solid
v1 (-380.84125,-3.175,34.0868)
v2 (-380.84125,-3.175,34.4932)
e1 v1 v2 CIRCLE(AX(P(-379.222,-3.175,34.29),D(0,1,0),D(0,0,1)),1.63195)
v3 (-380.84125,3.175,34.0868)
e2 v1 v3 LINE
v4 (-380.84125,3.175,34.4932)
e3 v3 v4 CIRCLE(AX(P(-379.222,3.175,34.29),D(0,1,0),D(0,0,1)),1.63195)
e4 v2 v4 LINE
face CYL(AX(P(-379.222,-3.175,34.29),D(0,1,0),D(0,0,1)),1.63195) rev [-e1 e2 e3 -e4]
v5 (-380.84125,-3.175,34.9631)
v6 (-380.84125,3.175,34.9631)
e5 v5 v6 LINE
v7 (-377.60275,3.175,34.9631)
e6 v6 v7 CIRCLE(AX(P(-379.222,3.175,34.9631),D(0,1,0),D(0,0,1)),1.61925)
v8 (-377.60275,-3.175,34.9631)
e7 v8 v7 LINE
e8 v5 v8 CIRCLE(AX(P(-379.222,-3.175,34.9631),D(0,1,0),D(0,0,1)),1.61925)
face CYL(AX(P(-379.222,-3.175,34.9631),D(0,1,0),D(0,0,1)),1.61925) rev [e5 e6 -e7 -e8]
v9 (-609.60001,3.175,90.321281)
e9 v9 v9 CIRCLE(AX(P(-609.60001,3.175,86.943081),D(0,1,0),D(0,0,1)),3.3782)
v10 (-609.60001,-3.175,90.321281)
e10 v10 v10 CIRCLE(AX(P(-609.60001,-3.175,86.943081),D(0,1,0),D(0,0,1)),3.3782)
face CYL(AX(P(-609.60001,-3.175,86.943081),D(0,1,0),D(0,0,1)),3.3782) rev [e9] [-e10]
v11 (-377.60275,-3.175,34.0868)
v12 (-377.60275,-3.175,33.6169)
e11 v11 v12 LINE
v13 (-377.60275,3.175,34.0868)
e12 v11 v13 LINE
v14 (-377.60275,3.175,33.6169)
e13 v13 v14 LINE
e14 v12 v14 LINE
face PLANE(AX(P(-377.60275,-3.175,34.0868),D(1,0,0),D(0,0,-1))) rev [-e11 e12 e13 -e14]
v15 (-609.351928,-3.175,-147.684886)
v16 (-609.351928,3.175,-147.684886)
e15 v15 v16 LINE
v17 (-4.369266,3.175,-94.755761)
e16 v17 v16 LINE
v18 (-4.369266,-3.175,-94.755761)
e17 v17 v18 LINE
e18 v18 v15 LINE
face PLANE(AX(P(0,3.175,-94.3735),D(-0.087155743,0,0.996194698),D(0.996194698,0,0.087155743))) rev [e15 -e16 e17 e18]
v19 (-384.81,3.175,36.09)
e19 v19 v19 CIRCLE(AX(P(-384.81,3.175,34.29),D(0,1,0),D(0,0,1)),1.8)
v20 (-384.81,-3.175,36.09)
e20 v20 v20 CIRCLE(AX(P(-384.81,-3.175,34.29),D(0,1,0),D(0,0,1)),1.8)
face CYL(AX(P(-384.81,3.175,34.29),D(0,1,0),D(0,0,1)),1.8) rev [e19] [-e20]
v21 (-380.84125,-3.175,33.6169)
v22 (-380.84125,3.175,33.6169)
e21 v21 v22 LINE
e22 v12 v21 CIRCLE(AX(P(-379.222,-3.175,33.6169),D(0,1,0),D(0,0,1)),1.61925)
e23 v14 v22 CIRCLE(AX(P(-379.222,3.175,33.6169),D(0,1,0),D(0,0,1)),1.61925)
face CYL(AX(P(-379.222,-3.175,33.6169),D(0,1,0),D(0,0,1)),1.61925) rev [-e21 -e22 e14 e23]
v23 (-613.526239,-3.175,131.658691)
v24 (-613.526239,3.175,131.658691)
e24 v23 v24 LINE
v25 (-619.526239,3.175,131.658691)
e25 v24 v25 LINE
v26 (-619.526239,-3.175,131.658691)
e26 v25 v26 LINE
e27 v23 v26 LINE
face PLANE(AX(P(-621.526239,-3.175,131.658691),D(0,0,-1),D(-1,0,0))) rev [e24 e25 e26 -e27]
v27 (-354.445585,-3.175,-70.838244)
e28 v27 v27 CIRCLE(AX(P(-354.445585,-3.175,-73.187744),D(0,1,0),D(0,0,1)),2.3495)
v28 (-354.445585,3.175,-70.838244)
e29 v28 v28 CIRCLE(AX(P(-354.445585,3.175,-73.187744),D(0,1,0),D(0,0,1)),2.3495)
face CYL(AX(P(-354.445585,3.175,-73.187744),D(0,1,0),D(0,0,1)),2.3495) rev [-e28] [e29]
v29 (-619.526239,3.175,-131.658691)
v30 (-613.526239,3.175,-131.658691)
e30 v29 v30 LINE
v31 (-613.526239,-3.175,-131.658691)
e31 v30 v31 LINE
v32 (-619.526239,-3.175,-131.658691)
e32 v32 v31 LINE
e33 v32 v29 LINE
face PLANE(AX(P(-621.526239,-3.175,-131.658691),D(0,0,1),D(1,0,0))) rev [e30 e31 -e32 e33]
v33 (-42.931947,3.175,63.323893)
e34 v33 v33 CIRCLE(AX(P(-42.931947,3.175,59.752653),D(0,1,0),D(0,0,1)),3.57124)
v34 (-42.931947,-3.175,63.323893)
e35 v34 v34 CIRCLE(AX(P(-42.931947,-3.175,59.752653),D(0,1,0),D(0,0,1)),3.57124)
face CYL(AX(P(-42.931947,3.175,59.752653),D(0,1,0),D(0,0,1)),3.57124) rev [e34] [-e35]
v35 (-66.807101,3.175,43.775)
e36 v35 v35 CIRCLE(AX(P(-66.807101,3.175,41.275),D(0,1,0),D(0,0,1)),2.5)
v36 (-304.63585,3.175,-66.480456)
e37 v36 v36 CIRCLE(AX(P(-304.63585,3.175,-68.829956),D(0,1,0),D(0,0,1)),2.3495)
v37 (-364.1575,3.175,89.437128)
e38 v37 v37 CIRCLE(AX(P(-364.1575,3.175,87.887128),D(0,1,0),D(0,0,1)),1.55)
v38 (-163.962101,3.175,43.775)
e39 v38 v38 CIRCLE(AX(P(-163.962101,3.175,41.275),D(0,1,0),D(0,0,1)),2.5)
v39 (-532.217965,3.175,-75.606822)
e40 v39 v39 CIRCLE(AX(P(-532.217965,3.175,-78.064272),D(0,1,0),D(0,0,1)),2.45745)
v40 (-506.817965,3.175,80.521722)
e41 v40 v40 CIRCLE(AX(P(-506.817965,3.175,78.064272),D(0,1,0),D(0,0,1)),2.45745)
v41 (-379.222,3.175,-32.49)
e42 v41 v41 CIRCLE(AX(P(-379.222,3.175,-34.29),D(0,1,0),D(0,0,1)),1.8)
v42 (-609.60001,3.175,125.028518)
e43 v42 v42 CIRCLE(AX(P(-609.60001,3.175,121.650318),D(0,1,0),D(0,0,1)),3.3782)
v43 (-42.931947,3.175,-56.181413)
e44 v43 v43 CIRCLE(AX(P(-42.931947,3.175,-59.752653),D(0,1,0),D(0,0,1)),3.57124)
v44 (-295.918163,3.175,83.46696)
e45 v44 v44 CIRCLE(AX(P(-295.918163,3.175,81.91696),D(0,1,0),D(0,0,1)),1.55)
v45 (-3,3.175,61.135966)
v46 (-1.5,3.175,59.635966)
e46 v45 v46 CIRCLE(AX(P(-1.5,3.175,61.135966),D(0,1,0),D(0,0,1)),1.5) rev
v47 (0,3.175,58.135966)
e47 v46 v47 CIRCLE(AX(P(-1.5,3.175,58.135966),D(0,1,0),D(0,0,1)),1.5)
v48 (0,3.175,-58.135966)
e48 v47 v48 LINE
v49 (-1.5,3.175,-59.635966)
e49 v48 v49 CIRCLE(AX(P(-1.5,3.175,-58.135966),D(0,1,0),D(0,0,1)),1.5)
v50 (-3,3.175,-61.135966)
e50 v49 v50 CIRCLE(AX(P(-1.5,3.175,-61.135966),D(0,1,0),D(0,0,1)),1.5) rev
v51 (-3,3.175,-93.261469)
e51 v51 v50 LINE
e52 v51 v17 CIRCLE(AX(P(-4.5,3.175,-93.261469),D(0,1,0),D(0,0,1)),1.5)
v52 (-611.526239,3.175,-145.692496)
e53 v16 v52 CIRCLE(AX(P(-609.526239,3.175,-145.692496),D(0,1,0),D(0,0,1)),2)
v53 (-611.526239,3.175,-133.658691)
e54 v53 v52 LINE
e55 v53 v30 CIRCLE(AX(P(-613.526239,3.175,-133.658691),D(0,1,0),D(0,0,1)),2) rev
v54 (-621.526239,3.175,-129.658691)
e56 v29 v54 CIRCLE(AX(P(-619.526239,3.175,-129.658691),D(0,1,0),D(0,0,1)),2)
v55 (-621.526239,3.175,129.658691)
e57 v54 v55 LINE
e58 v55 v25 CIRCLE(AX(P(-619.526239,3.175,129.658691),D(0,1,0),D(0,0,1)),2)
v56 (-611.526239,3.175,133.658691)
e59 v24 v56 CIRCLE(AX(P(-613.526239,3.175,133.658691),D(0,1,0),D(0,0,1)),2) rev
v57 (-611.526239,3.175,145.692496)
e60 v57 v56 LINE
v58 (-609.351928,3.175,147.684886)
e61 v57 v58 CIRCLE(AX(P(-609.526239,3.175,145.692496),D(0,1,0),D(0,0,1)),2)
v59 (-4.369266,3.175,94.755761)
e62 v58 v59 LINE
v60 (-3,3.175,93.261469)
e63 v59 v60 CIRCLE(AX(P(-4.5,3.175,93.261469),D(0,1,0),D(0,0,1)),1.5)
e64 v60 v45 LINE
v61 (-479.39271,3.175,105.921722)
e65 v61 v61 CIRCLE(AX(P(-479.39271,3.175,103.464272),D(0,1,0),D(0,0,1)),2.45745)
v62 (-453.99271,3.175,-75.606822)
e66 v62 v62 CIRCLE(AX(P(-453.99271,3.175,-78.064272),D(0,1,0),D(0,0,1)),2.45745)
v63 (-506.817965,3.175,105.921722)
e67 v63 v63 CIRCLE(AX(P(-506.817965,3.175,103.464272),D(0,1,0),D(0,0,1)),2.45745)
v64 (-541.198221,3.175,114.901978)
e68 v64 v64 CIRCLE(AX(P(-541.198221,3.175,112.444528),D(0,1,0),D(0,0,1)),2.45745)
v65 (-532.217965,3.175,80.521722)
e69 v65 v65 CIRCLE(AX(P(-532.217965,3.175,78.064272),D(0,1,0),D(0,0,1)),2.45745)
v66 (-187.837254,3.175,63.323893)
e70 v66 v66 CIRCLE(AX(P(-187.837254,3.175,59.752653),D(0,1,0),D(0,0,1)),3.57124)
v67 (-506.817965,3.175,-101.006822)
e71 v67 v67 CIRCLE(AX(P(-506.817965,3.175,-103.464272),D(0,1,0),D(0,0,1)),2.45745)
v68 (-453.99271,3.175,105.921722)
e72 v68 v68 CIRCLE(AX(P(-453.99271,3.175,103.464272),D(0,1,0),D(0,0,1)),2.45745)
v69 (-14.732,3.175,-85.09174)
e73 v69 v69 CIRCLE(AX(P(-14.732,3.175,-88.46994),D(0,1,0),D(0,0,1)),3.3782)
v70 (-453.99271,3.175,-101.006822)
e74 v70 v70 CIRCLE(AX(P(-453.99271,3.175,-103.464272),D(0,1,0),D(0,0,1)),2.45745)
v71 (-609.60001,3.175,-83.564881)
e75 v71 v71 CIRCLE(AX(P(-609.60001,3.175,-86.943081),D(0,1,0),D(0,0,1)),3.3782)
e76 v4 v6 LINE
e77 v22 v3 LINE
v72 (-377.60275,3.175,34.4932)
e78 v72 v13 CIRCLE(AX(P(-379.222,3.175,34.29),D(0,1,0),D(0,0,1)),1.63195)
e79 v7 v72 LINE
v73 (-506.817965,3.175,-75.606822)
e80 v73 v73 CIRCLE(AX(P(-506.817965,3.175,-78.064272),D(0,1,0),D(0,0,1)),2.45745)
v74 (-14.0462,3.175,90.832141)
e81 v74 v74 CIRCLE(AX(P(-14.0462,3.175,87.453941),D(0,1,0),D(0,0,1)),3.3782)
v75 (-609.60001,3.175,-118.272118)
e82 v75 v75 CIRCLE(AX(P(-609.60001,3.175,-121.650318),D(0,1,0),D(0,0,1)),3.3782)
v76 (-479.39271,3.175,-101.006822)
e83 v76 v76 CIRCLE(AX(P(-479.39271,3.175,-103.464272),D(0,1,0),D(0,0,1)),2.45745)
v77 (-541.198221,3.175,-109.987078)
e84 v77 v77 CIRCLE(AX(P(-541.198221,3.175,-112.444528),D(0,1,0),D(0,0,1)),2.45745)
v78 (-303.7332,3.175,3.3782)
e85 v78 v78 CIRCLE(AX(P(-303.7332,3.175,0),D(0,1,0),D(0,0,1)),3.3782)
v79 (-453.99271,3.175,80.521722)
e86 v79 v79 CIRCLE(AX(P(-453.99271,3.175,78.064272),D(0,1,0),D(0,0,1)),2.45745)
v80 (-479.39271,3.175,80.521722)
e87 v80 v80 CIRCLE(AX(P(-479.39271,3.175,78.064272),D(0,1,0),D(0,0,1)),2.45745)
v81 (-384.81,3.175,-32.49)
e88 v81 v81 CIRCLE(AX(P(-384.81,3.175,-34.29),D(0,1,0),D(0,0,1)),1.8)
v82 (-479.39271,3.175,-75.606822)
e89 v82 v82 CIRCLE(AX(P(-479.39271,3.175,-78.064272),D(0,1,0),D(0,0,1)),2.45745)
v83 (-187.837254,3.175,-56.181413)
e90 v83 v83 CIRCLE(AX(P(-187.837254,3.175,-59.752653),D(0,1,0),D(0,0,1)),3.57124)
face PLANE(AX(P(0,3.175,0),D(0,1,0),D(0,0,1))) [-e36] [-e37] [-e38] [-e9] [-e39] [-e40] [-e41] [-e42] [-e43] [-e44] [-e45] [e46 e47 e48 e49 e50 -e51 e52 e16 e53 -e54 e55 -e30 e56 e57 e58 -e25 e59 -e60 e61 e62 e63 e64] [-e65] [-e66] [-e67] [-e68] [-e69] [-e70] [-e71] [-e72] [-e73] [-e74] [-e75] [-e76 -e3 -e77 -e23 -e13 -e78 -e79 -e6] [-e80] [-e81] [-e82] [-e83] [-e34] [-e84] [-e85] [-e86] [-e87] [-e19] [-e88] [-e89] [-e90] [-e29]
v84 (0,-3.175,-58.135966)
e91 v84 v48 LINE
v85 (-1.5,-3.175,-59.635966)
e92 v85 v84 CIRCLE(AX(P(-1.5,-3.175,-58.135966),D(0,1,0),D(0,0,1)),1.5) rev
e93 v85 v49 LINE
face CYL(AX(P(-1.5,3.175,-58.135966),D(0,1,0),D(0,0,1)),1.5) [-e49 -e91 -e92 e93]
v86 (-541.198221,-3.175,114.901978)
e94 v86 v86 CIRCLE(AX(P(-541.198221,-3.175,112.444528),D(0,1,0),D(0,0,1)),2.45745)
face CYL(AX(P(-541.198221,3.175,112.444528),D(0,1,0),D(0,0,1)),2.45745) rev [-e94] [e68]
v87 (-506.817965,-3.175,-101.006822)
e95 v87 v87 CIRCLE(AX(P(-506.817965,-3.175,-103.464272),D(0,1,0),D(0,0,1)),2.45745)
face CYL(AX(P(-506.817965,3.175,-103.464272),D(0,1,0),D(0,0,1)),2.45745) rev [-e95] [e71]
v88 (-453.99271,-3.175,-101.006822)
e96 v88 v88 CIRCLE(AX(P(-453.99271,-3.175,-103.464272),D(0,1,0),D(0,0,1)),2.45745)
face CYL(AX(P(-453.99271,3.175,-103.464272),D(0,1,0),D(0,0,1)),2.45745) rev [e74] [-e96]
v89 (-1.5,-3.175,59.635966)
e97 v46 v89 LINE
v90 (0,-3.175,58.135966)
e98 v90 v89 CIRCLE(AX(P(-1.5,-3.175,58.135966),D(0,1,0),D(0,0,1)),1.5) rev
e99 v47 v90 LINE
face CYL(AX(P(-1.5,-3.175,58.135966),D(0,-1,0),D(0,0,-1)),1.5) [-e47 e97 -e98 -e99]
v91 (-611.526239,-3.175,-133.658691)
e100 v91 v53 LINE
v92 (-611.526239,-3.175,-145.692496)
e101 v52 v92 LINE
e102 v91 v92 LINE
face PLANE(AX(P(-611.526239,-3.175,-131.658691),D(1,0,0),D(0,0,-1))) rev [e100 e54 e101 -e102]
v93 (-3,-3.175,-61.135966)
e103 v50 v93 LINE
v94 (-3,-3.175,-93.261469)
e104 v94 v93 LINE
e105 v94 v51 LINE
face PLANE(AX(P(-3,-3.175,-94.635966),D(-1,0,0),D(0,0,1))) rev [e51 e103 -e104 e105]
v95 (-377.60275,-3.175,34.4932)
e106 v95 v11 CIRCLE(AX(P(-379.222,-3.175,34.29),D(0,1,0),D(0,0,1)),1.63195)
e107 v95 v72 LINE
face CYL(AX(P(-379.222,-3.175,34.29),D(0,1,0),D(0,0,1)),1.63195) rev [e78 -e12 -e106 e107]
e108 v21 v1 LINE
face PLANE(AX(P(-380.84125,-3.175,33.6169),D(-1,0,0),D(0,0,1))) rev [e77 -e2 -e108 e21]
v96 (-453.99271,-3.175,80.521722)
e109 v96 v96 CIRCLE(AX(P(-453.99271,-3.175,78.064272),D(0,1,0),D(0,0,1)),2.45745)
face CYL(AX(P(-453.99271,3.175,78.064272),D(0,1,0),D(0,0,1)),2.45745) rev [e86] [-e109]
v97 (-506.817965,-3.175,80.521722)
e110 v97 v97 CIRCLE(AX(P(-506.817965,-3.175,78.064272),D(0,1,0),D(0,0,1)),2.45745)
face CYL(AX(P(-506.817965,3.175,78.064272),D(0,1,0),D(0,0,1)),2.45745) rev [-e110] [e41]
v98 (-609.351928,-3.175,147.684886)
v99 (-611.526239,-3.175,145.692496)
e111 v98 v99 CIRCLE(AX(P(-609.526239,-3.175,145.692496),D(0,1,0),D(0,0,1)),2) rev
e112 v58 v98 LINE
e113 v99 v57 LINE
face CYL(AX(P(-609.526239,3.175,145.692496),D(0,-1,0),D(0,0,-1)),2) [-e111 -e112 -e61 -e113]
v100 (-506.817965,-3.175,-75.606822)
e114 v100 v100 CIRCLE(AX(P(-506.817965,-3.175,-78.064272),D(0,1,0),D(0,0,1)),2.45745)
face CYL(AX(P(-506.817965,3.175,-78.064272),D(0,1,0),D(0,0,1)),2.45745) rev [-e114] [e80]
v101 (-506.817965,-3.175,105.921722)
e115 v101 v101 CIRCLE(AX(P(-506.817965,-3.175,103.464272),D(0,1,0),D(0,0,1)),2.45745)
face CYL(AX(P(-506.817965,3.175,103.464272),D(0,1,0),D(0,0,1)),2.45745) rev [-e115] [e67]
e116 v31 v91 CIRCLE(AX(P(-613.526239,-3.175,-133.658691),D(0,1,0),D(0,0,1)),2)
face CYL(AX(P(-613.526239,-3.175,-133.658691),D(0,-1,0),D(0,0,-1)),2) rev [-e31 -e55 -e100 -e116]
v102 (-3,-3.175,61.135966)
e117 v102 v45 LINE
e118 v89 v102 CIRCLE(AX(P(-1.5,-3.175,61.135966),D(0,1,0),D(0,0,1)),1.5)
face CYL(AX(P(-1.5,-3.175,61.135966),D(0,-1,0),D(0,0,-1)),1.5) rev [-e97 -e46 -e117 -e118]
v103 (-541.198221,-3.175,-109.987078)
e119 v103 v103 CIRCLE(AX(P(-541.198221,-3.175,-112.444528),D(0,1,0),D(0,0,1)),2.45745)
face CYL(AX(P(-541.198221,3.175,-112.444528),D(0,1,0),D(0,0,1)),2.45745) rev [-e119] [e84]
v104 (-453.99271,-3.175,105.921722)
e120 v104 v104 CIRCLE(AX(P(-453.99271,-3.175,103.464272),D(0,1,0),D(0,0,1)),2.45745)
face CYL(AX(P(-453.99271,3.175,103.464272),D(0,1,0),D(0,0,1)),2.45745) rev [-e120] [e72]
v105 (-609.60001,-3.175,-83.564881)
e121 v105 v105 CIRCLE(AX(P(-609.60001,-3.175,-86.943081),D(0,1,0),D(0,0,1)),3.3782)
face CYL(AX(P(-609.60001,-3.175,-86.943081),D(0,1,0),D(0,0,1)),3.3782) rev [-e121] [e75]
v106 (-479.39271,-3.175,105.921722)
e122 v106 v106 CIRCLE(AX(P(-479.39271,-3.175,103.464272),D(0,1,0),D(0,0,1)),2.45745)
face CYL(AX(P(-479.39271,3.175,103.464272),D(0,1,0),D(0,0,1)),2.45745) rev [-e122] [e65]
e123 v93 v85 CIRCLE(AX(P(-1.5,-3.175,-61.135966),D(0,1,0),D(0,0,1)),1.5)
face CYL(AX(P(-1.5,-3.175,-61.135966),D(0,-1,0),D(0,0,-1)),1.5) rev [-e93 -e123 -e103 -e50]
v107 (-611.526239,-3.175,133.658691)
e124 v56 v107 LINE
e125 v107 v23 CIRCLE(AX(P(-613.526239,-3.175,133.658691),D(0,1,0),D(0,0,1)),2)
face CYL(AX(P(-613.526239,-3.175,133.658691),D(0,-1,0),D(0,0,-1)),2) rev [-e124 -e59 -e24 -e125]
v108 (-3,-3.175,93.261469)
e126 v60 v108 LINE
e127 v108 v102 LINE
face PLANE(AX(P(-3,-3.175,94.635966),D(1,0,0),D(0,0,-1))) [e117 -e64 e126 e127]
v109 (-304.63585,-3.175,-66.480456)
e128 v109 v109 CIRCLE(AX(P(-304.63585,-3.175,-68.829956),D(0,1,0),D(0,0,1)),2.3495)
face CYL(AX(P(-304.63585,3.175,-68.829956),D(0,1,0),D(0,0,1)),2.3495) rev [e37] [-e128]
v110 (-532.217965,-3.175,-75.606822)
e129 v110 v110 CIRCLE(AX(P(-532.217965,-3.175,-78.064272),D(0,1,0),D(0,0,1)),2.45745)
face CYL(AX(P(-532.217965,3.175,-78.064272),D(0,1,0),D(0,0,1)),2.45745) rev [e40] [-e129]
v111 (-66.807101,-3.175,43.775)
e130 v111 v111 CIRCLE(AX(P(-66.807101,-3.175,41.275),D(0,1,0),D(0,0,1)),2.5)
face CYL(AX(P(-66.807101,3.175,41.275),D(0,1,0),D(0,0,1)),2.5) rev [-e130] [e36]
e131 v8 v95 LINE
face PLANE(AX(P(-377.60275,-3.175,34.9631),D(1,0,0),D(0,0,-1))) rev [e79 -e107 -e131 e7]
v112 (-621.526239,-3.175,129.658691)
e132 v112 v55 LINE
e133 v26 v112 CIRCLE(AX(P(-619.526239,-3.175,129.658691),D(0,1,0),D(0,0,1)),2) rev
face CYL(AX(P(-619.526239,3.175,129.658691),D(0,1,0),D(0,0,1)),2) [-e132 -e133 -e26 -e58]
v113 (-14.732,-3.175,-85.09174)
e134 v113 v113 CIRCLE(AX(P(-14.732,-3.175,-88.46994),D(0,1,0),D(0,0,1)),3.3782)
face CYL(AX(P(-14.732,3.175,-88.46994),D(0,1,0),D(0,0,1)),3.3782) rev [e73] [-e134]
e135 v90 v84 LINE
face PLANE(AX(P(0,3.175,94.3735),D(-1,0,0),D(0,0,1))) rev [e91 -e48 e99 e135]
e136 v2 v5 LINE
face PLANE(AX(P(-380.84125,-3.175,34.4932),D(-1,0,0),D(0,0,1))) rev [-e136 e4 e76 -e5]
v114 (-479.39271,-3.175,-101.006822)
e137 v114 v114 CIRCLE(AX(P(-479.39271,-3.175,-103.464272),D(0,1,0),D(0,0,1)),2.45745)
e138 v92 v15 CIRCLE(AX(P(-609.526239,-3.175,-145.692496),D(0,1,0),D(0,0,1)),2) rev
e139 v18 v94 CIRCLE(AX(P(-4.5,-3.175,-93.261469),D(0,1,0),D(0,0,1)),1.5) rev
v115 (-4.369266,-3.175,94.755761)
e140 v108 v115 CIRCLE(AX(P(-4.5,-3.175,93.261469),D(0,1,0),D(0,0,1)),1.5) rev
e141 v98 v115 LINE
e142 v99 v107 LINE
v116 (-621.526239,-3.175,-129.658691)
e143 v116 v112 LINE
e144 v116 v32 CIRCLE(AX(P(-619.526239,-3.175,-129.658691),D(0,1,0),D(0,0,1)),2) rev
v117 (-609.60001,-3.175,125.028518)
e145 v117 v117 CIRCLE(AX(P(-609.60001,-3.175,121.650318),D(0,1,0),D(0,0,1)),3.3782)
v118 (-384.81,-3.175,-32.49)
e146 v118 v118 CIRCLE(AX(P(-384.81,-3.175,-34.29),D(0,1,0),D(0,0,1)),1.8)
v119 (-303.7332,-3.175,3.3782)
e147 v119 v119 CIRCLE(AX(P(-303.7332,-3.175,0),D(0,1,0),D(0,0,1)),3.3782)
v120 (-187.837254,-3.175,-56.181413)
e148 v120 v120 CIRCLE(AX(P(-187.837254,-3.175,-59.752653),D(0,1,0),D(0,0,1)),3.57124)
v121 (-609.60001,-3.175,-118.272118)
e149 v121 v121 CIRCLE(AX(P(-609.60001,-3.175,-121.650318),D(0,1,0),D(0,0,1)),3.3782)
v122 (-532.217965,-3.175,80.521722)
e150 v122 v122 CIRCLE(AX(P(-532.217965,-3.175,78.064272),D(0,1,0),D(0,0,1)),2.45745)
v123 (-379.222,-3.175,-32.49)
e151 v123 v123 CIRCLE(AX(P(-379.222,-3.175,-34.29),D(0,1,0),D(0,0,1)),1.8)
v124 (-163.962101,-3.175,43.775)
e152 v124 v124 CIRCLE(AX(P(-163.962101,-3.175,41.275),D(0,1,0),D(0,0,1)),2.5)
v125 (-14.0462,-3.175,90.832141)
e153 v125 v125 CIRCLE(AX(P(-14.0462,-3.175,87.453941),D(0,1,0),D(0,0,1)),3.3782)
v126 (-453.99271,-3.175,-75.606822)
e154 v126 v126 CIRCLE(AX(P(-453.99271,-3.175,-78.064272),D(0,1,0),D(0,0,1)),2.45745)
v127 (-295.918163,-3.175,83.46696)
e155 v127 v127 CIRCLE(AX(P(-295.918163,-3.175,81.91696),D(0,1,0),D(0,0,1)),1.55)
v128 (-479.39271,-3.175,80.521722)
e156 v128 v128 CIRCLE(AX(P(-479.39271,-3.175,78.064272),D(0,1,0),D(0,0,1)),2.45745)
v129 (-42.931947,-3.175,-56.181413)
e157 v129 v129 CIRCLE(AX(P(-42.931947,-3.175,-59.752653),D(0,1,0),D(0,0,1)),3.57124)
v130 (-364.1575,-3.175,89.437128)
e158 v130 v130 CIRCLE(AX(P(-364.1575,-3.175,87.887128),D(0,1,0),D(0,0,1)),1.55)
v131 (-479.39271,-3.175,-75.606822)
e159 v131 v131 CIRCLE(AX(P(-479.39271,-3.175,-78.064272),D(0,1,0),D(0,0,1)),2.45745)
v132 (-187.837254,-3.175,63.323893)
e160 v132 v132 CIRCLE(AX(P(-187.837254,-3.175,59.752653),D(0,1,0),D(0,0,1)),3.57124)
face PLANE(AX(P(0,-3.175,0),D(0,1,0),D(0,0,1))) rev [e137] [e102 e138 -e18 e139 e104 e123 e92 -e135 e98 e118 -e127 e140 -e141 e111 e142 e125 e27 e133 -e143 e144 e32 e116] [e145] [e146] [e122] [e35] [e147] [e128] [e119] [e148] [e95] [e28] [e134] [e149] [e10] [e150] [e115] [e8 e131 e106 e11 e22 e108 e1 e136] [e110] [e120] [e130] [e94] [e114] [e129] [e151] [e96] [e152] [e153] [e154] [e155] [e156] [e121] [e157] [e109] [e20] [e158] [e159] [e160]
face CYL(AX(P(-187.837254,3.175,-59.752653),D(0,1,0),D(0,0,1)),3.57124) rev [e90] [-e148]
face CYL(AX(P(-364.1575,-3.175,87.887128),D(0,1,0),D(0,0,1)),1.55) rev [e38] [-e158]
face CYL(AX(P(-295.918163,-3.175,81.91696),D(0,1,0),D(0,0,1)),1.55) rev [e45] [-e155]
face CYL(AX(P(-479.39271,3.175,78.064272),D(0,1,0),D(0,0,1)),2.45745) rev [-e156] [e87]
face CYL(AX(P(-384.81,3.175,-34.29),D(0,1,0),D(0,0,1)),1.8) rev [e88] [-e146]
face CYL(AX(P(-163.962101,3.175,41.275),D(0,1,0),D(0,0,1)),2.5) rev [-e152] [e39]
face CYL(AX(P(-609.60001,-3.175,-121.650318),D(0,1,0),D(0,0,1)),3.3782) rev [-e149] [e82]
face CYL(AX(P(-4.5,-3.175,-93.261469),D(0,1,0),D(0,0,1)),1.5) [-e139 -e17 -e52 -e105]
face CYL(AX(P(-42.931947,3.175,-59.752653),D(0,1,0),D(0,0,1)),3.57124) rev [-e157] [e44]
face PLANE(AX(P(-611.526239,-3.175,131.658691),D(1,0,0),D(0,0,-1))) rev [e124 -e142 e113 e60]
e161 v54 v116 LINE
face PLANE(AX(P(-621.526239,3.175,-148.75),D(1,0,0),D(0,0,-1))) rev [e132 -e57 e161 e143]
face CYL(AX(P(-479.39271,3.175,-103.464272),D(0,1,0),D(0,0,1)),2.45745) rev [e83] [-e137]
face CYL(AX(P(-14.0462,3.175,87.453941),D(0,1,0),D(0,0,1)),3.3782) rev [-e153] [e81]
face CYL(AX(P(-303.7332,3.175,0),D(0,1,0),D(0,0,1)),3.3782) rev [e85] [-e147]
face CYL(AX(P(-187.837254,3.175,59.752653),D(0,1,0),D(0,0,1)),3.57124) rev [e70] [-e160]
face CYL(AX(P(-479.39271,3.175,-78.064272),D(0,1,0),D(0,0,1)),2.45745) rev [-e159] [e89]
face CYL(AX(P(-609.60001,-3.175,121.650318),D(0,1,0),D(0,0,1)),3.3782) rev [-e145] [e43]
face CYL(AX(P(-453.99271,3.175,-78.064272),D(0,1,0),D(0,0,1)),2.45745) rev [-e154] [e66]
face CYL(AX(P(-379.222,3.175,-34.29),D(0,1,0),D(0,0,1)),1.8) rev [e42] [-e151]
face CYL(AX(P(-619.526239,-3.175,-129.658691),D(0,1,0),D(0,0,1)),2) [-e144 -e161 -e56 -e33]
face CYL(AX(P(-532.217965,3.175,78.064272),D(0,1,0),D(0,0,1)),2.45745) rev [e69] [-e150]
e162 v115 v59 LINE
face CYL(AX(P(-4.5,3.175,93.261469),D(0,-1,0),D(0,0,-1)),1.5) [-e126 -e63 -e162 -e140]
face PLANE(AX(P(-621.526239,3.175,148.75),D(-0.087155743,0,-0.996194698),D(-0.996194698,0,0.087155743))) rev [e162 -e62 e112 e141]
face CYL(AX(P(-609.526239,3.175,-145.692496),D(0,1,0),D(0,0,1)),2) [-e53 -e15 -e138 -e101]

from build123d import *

# Parameters (mm, degrees)
BOSS_EXTRUDE1_DEPTH         = 3.175
M3_CLEARANCE_HOLE1_D        = 3.6
F_1_4_CLEARANCE_HOLE1_D     = 7.14248
CUT_EXTRUDE1_DEPTH          = 640.11012417
F_8_CLEARANCE_HOLE1_D       = 4.9149
SKETCH15_R                  = 1.55
CUT_EXTRUDE2_DEPTH          = 640.11012417
SKETCH16_R                  = 3.3782
CUT_EXTRUDE3_DEPTH          = 640.11012417
FILLET1_R                   = 1
CUT_EXTRUDE4_DEPTH          = 640.088878697
FILLET2_R                   = 1.5
F_13_0_185_DIAMETER_HOLE1_D = 4.699
F_1_4_CLEARANCE_HOLE2_D     = 6.7564
SKETCH23_W                  = 10
SKETCH23_H                  = 17
CUT_EXTRUDE5_DEPTH          = 640.088878697
FILLET3_R                   = 2
F_5_0MM_DOWEL_HOLE1_D       = 5


with BuildPart() as part:
    # Sketch1 → Boss-Extrude1 (new, symmetric)
    with BuildSketch(Plane(origin=(0, 0, 0), x_dir=(1, 0, 0), z_dir=(0, 1, 0))):
        Polygon((0, -94.3735), (0, 94.3735), (-621.526239041, 148.75), (-621.526239041, -148.75), align=None)
    extrude(amount=BOSS_EXTRUDE1_DEPTH, both=True)

    # M3 Clearance Hole1 (through all)
    with Locations(Plane(origin=(0, 3.175, 0), x_dir=(1, 0, 0), z_dir=(0, 1, 0))):
        with Locations((-379.222, 34.29), (-384.81, 34.29), (-384.81, -34.29)):
            Hole(M3_CLEARANCE_HOLE1_D / 2)

    # 1/4 Clearance Hole1 (through all)
    with Locations(Plane(origin=(0, 3.175, 0), x_dir=(1, 0, 0), z_dir=(0, 1, 0))):
        with Locations((-187.837254031, 59.752653333), (-42.931947364, 59.752653333), (-42.931947364, -59.752653333), (-187.837254031, -59.752653333)):
            Hole(F_1_4_CLEARANCE_HOLE1_D / 2)

    # Sketch12 → Cut-Extrude1 (cut, through all)
    with BuildSketch(Plane(origin=(0, 3.175, 0), x_dir=(1, 0, 0), z_dir=(0, 1, 0))):
        with BuildLine():
            Line((-380.84125, -33.6169), (-380.84125, -34.0868))
            ThreePointArc((-380.84125, -34.0868), (-380.85395, -34.29), (-380.84125, -34.4932))
            Line((-380.84125, -34.4932), (-380.84125, -34.9631))
            ThreePointArc((-380.84125, -34.9631), (-379.222, -36.58235), (-377.60275, -34.9631))
            Line((-377.60275, -34.9631), (-377.60275, -34.4932))
            ThreePointArc((-377.60275, -34.4932), (-377.59005, -34.29), (-377.60275, -34.0868))
            Line((-377.60275, -34.0868), (-377.60275, -33.6169))
            ThreePointArc((-377.60275, -33.6169), (-379.222, -31.99765), (-380.84125, -33.6169))
        make_face()
    extrude(amount=-CUT_EXTRUDE1_DEPTH, mode=Mode.SUBTRACT)

    # #8 Clearance Hole1 (through all)
    with Locations(Plane(origin=(0, 3.175, 0), x_dir=(1, 0, 0), z_dir=(0, 1, 0))):
        with Locations((-506.81796477, -78.064272283), (-506.81796477, -103.464272283), (-541.198220891, -112.444528404), (-532.21796477, -78.064272283), (-479.392709852, -78.064272283), (-479.392709852, -103.464272283), (-453.992709852, -78.064272283), (-453.992709852, -103.464272283), (-453.992709852, 78.064272283), (-453.992709852, 103.464272283), (-479.392709852, 78.064272283), (-479.392709852, 103.464272283), (-541.198220891, 112.444528404), (-532.21796477, 78.064272283), (-506.81796477, 103.464272283), (-506.81796477, 78.064272283)):
            Hole(F_8_CLEARANCE_HOLE1_D / 2)

    # Sketch15 → Cut-Extrude2 (cut, through all)
    with BuildSketch(Plane(origin=(0, 3.175, 0), x_dir=(1, 0, 0), z_dir=(0, 1, 0))):
        with Locations(Location((-295.918163181, -81.916960017, 0), (0, 0, 270))):
            Circle(SKETCH15_R)
        with Locations(Location((-364.1575, -87.887128395, 0), (0, 0, 270))):
            Circle(SKETCH15_R)
    extrude(amount=-CUT_EXTRUDE2_DEPTH, mode=Mode.SUBTRACT)

    # Sketch16 → Cut-Extrude3 (cut, through all)
    with BuildSketch(Plane(origin=(0, 3.175, 0), x_dir=(1, 0, 0), z_dir=(0, 1, 0))):
        with Locations(Location((-609.6000104, -121.650317511, 0), (0, 0, 270))):
            Circle(SKETCH16_R)
        with Locations(Location((-609.6000104, -86.943080709, 0), (0, 0, 270))):
            Circle(SKETCH16_R)
        with Locations(Location((-609.6000104, 86.943080709, 0), (0, 0, 270))):
            Circle(SKETCH16_R)
        with Locations(Location((-609.6000104, 121.650317511, 0), (0, 0, 270))):
            Circle(SKETCH16_R)
    extrude(amount=-CUT_EXTRUDE3_DEPTH, mode=Mode.SUBTRACT)

    # Fillet1
    fillet1_edges = [part.edges().sort_by_distance(p)[0] for p in [
        (-621.526239041, 0, 148.75),
        (-621.526239041, 0, -148.75),
    ]]
    fillet(fillet1_edges, radius=FILLET1_R)

    # Sketch17 → Cut-Extrude4 (cut, through all)
    with BuildSketch(Plane(origin=(0, 3.175, 0), x_dir=(1, 0, 0), z_dir=(0, 1, 0))):
        Polygon((-3, 94.635965991), (-3, 59.635965991), (0, 59.635965991), (0, 94.3735), align=None)
    cut_extrude4 = extrude(amount=-CUT_EXTRUDE4_DEPTH, mode=Mode.SUBTRACT)

    # Mirror1: Cut-Extrude4 across plane
    add(cut_extrude4.mirror(Plane.XY), mode=Mode.SUBTRACT)

    # Fillet2
    fillet2_edges = [part.edges().sort_by_distance(p)[0] for p in [
        (0, 0, -59.635965991),
        (-3, 0, -59.635965991),
        (-3, 0, -94.635965991),
        (0, 0, 59.635965991),
        (-3, 0, 59.635965991),
        (-3, 0, 94.635965991),
    ]]
    fillet(fillet2_edges, radius=FILLET2_R - 0.0001)  # a hair under: the kernel refuses the full size

    # #13 (0.185) Diameter Hole1 (through all)
    with Locations(Plane(origin=(0, 3.175, 0), x_dir=(1, 0, 0), z_dir=(0, 1, 0))):
        with Locations((-354.44558465, 73.187743603), (-304.635849746, 68.829956465)):
            Hole(F_13_0_185_DIAMETER_HOLE1_D / 2)

    # 1/4 Clearance Hole2 (through all)
    with Locations(Plane(origin=(0, 3.175, 0), x_dir=(1, 0, 0), z_dir=(0, 1, 0))):
        with Locations((-14.732, 88.469940408), (-14.0462, -87.453940528), (-303.7332, 0)):
            Hole(F_1_4_CLEARANCE_HOLE2_D / 2)

    # Sketch23 → Cut-Extrude5 (cut, through all)
    with BuildSketch(Plane(origin=(0, 3.175, 0), x_dir=(1, 0, 0), z_dir=(0, 1, 0))):
        with Locations((-616.526239041, 140.158691499)):
            Rectangle(SKETCH23_W, SKETCH23_H)
        with Locations((-616.526239041, -140.158691499)):
            Rectangle(SKETCH23_W, SKETCH23_H)
    extrude(amount=-CUT_EXTRUDE5_DEPTH, mode=Mode.SUBTRACT)

    # Fillet3
    fillet3_edges = [part.edges().sort_by_distance(p)[0] for p in [
        (-611.526239041, 0, -147.875113365),
        (-621.526239041, 0, -131.658691499),
        (-611.526239041, 0, -131.658691499),
        (-611.526239041, 0, 147.875113365),
        (-611.526239041, 0, 131.658691499),
        (-621.526239041, 0, 131.658691499),
    ]]
    fillet(fillet3_edges, radius=FILLET3_R)

    # Ø5.0mm Dowel Hole1 (through all)
    with Locations(Plane(origin=(0, 3.175, 0), x_dir=(1, 0, 0), z_dir=(0, 1, 0))):
        with Locations((-163.962100698, -41.275), (-66.807100698, -41.275)):
            Hole(F_5_0MM_DOWEL_HOLE1_D / 2)


solid = part.part
